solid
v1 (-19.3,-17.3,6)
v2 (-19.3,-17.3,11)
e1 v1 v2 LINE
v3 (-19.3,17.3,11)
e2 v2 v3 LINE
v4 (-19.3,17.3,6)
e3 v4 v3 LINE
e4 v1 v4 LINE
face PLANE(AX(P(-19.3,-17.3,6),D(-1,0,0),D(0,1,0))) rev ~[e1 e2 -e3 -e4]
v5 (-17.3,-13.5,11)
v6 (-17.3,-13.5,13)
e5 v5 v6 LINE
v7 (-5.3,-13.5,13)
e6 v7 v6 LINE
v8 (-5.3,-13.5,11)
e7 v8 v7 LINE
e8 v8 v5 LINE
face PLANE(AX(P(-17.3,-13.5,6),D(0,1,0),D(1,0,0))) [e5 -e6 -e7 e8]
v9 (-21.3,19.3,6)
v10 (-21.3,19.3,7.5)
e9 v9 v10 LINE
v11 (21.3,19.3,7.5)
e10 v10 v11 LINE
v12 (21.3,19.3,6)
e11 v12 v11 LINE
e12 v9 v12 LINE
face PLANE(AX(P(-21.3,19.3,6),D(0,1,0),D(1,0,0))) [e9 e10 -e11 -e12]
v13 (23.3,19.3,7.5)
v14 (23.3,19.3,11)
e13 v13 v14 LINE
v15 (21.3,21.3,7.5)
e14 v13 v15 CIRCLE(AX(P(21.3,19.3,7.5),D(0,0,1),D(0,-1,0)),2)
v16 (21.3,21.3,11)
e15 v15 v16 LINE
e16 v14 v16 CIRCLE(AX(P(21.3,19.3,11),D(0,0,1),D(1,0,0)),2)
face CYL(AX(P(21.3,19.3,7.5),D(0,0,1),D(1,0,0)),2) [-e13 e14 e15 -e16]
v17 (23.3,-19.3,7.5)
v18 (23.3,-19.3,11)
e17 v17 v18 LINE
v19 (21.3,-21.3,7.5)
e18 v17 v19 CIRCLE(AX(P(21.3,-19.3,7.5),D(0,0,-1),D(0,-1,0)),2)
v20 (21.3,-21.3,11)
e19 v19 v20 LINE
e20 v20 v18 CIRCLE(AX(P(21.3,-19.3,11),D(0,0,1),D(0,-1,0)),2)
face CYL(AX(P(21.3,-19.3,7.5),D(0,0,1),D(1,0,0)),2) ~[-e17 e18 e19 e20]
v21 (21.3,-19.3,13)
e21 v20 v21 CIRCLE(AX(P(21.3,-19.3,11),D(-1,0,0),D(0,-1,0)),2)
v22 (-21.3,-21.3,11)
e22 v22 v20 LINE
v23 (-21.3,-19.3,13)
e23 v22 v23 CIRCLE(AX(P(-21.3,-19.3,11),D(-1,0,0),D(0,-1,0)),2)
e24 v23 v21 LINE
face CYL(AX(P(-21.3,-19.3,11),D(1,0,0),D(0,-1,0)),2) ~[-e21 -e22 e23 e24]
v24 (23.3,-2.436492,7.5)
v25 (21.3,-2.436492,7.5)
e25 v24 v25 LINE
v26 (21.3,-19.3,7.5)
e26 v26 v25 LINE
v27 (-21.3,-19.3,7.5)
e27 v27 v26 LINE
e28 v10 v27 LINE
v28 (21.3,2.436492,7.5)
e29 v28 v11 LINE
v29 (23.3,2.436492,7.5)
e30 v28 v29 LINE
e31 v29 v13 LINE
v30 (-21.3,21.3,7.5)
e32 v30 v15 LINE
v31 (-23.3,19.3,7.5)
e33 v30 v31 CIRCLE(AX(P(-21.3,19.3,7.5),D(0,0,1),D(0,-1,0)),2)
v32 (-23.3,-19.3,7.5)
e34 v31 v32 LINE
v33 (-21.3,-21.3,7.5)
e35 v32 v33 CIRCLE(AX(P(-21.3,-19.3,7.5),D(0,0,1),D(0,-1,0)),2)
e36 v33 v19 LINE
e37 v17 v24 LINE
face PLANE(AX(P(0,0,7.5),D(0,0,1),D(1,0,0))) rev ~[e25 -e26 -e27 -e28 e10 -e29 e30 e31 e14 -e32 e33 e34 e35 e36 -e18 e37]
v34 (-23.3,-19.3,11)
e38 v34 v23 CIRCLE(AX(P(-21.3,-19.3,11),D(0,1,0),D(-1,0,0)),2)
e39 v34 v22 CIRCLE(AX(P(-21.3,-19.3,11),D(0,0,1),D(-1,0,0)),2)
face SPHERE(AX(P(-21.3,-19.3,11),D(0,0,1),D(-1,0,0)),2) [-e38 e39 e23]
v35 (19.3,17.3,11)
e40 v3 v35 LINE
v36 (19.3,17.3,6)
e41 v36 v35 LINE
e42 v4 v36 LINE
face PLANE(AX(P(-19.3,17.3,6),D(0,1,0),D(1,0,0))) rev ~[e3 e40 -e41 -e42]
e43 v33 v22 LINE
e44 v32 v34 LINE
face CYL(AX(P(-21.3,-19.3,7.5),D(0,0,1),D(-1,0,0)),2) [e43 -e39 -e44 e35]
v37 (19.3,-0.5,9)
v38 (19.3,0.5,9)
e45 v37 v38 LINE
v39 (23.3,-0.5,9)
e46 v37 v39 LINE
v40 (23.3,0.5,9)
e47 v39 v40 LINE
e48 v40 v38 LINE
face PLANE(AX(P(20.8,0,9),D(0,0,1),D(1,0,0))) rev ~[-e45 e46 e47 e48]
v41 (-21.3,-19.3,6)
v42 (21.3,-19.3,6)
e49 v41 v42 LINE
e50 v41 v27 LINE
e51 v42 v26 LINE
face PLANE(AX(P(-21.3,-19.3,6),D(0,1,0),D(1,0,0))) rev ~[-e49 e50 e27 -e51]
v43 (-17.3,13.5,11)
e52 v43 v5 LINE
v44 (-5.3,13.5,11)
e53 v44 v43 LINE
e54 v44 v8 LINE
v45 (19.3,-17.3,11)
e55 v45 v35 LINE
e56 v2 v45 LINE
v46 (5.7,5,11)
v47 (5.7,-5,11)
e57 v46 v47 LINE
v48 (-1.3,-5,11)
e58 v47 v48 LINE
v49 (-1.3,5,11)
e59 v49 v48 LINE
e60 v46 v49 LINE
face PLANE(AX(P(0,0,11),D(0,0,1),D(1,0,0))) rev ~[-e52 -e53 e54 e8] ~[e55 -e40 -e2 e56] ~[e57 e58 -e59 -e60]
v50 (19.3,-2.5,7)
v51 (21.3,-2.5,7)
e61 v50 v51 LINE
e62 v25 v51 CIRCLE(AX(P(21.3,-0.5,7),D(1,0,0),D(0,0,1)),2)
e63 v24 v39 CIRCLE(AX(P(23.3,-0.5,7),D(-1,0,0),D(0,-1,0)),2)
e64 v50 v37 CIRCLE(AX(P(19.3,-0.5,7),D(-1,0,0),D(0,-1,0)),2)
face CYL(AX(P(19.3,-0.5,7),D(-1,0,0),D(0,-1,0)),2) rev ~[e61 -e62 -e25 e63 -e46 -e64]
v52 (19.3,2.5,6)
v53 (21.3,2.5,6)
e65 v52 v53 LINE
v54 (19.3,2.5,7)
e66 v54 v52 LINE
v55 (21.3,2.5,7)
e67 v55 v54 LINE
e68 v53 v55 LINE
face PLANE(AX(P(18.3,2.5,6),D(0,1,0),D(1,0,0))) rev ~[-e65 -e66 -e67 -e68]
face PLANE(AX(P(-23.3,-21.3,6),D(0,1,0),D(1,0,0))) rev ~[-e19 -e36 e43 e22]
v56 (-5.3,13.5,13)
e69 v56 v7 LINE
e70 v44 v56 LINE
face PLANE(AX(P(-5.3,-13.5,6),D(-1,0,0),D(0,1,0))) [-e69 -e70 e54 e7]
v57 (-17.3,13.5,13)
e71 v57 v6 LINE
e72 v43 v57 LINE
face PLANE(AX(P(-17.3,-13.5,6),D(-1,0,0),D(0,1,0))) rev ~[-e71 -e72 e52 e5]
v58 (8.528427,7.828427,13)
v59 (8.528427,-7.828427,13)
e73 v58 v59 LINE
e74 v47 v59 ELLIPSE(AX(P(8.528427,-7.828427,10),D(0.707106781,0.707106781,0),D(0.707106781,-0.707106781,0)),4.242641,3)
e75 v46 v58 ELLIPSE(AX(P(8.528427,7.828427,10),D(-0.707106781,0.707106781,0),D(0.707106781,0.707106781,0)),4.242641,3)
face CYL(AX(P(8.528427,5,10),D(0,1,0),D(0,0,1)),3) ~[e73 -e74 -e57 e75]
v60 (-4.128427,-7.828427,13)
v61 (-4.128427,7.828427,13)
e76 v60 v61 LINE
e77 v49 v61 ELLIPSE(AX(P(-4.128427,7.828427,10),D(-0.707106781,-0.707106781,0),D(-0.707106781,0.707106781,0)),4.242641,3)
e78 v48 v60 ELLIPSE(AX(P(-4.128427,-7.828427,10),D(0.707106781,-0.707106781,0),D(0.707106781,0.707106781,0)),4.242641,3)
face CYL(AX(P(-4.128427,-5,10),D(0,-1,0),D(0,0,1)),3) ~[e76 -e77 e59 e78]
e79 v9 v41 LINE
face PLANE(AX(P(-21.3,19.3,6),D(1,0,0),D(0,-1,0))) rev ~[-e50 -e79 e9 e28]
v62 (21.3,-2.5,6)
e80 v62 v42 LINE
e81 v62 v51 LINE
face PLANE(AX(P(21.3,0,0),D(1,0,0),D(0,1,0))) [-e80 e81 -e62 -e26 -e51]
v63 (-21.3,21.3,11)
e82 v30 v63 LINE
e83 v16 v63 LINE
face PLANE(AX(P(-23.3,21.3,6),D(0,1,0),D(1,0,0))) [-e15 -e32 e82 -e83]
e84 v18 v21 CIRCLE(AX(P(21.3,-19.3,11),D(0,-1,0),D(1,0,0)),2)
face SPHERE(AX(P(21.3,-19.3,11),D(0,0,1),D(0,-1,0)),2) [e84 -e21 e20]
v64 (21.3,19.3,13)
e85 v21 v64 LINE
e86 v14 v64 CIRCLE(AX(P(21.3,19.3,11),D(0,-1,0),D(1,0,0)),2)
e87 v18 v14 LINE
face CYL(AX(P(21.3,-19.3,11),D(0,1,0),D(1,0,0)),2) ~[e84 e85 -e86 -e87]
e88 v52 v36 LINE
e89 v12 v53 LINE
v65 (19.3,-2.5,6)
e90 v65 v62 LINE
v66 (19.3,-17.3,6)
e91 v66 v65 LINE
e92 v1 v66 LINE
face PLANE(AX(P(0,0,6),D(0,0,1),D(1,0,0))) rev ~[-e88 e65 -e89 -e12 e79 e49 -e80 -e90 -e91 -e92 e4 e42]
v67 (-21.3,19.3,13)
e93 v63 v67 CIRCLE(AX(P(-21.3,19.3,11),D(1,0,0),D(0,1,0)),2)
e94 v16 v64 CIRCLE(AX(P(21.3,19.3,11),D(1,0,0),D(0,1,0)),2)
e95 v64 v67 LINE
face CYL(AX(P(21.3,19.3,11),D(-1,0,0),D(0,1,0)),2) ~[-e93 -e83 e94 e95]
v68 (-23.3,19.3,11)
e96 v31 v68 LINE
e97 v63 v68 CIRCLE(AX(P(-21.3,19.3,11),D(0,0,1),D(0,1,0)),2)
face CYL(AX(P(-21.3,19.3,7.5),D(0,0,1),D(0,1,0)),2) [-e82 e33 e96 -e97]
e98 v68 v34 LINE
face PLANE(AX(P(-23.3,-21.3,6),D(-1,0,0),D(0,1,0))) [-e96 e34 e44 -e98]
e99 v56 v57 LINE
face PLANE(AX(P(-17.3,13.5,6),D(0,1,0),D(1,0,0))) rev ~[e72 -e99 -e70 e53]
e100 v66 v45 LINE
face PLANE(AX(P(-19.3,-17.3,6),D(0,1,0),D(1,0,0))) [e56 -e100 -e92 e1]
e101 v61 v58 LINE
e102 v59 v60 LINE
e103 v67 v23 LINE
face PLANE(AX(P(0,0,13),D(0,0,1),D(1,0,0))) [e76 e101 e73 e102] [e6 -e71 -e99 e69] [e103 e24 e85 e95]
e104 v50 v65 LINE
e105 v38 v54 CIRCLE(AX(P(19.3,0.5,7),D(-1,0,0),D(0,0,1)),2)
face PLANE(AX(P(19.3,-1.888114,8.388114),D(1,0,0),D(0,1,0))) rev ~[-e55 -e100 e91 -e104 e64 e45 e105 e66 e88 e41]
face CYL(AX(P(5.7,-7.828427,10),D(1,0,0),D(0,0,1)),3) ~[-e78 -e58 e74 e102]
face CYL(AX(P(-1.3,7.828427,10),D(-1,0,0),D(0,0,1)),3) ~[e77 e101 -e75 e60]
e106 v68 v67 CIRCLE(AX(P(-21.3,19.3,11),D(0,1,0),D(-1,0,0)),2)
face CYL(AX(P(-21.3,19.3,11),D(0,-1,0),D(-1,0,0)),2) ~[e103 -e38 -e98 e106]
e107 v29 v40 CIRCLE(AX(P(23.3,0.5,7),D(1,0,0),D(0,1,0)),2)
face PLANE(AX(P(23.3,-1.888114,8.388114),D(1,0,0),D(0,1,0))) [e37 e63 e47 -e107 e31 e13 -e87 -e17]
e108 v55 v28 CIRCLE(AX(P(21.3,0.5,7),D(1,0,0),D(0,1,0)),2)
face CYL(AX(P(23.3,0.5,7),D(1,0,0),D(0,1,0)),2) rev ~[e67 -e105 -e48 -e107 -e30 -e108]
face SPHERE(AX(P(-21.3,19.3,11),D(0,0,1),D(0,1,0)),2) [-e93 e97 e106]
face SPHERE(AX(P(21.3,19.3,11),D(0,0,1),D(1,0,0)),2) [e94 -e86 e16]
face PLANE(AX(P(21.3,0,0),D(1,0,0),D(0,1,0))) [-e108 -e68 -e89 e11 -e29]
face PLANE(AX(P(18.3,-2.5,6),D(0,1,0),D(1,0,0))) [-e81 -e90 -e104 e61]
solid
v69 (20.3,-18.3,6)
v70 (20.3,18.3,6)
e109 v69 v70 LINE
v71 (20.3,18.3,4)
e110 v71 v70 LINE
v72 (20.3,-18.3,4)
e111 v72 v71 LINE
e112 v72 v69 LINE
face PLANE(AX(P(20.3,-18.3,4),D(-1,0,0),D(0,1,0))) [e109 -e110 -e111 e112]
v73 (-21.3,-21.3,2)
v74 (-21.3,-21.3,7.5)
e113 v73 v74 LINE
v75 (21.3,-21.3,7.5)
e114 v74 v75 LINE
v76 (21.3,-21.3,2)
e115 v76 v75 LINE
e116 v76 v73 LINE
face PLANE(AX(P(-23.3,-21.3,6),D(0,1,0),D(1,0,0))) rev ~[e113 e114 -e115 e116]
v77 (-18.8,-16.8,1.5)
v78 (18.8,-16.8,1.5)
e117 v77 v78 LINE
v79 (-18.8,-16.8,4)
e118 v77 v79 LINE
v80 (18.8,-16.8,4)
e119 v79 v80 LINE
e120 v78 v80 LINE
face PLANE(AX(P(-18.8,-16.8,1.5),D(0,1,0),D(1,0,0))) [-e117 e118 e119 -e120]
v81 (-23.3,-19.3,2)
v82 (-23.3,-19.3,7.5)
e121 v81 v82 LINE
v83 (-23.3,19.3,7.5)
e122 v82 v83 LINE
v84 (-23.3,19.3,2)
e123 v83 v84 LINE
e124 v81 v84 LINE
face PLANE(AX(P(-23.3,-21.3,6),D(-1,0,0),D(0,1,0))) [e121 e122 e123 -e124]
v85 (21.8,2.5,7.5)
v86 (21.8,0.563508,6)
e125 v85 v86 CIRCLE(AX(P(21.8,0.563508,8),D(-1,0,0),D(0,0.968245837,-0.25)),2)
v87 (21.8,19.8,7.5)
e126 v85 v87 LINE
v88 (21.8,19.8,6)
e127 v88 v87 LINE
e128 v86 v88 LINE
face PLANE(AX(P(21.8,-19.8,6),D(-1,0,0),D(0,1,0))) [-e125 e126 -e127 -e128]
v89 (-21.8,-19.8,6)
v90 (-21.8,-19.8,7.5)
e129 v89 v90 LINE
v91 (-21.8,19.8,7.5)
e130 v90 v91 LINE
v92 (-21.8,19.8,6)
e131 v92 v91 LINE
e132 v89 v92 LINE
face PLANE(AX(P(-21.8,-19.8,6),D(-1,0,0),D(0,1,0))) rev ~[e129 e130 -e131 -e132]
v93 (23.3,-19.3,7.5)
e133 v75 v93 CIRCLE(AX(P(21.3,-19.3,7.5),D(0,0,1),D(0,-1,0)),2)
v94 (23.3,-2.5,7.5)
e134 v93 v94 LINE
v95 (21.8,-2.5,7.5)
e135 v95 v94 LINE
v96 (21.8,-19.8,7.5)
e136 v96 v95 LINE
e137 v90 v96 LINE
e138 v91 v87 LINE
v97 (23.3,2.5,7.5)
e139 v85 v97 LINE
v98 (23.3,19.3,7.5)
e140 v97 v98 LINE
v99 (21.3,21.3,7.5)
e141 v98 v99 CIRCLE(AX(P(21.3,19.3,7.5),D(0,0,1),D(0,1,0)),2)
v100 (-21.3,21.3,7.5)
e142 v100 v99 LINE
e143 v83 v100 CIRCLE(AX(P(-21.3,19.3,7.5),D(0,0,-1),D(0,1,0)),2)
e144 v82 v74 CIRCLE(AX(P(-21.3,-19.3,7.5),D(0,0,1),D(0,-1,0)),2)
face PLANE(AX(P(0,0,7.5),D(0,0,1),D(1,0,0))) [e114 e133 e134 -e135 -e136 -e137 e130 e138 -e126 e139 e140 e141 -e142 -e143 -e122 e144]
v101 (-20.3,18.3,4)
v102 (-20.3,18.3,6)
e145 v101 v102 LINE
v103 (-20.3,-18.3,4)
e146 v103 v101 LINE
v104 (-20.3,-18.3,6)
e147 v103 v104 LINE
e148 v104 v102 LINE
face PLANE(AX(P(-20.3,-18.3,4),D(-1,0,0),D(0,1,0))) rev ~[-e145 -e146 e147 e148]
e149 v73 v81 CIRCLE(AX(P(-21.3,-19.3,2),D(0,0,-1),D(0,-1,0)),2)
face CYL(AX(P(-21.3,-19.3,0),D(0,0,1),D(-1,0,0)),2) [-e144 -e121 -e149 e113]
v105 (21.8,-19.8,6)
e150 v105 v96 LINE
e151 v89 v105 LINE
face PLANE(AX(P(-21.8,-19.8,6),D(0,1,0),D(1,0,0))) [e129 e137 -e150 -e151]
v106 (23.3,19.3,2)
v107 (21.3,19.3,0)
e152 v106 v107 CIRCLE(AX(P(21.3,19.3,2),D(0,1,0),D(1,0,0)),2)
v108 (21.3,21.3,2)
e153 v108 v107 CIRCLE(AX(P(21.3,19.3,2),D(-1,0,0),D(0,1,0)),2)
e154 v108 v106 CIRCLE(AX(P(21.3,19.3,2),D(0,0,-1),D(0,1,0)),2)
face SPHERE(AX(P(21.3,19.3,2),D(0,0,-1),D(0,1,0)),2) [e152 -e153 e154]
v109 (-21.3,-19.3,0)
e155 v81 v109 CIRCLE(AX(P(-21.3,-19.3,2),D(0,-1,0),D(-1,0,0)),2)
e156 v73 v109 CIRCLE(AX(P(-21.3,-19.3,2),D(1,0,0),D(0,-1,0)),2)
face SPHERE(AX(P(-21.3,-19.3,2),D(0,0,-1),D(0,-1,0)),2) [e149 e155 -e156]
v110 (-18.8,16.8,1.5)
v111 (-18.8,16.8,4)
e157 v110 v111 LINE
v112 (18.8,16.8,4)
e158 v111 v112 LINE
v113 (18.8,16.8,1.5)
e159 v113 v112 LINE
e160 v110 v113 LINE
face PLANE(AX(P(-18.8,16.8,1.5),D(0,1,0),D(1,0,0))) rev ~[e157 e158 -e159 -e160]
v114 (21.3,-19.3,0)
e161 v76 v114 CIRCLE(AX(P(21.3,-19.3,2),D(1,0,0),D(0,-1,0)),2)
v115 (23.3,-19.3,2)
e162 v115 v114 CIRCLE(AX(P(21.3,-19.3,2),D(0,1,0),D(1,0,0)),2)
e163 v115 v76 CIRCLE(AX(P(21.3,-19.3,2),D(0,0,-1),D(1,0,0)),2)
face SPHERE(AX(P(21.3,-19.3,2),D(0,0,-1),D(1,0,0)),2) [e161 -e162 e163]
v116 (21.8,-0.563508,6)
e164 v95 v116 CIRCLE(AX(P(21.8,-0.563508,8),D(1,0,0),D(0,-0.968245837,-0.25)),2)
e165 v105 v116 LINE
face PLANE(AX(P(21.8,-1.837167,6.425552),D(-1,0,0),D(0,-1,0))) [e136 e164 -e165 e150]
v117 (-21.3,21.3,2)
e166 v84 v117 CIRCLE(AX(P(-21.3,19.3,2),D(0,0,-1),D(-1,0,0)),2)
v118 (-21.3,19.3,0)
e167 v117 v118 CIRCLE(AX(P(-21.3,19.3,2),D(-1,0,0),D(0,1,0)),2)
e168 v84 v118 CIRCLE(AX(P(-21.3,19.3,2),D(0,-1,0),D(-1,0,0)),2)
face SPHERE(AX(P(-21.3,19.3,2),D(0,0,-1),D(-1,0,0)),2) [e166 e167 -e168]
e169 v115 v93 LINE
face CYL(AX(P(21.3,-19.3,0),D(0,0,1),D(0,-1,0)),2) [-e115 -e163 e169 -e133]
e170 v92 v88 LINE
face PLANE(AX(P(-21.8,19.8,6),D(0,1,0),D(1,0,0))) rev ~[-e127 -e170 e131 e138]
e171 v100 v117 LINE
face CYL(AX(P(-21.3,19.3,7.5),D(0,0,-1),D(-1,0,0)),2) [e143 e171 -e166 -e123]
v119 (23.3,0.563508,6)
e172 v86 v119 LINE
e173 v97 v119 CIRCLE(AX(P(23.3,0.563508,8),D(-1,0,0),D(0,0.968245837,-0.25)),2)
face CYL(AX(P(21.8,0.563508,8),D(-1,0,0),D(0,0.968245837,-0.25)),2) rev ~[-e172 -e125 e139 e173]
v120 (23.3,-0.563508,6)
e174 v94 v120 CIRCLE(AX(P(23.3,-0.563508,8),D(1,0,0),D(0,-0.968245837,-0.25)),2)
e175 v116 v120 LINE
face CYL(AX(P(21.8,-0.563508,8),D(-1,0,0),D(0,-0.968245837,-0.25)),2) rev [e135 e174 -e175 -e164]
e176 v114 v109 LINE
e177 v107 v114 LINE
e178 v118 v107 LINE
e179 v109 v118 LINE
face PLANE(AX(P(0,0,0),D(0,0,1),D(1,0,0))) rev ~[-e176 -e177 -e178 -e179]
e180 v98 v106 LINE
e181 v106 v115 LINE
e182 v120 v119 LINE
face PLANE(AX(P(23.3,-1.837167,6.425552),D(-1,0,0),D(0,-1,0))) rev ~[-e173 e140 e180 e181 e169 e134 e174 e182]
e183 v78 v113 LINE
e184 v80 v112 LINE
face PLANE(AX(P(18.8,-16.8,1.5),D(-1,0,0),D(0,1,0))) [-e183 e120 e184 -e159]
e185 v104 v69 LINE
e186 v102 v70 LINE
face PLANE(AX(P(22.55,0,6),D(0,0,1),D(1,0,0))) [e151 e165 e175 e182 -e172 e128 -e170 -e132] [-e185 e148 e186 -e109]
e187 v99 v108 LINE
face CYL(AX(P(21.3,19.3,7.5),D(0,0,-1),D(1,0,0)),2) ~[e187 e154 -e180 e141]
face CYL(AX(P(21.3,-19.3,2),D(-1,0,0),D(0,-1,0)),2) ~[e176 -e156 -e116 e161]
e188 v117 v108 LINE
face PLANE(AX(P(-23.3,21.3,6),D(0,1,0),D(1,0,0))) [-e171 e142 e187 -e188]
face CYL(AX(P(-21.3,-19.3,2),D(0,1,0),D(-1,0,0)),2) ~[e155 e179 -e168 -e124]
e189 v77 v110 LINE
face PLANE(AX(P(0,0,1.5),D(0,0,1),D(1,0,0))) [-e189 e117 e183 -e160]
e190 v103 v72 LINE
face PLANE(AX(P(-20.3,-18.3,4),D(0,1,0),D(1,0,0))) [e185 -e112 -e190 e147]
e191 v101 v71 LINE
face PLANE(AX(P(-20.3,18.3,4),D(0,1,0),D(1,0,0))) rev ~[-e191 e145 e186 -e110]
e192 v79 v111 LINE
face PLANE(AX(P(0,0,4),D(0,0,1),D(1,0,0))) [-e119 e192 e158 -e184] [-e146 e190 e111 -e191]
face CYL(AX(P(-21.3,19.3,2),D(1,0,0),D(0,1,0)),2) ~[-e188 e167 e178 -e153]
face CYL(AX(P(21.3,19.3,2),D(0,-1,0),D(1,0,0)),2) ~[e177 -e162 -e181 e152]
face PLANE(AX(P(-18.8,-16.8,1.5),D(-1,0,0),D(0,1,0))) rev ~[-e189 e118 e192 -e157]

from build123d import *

# Parameters (mm, degrees)
F2_W          = 46.6
F2_H          = 42.6
F3_DEPTH      = 6
F5_W          = 37.6
F5_H          = 33.6
F6_DEPTH      = 4.5
F8_W          = 40.6
F8_H          = 36.6
F8_W_2        = 37.6
F8_H_2        = 33.6
F9_DEPTH      = 2
F10_W         = 46.6
F10_H         = 42.6
F10_W_2       = 43.6
F10_H_2       = 39.6
F11_DEPTH     = 1.5
F12_R         = 2
F13_W         = 1.5
F13_H         = 5
F14_DEPTH     = 1.5
F15_T1_DEPTH  = 1.5
F16_R         = 2
F18_W         = 46.6
F18_H         = 42.6
F19_DEPTH     = 7
F20_W         = 38.6
F20_H         = 34.6
F21_DEPTH     = 5
F22_W         = 46.6
F22_H         = 42.6
F22_W_2       = 42.6
F22_H_2       = 38.6
F23_DEPTH     = 1.5
F24_W         = 5
F24_H         = 5
F25_DEPTH     = 3
F26_T4_DEPTH  = 4
F26_T10_DEPTH = 4
F26_T16_DEPTH = 4
F26_T22_DEPTH = 4
F26_T28_DEPTH = 4
F26_T34_DEPTH = 4
F27_W         = 7
F27_H         = 10
F27_W_2       = 12
F27_H_2       = 27
F28_DEPTH     = 9.4
F29_R         = 2
F30_R         = 2
F31_T1_DEPTH  = 7
F31_T3_DEPTH  = 10
F31_T9_DEPTH  = 14.0710678119
F31_T14_DEPTH = 17.0710678119
F31_T21_DEPTH = 17.0710678119
F31_T25_DEPTH = 14.0710678119
F31_T32_DEPTH = 14.0710678119
F31_T36_DEPTH = 17.0710678119
F31_T43_DEPTH = 14.0710678119
F31_T48_DEPTH = 17.0710678119


# Not quite as in the source:
# - a fillet or chamfer that OpenCascade refuses, or shapes differently, is made with other operations: its cross-section is extruded or revolved along the edge and cut away or added


with BuildPart() as f3:
    # F2 (on Top) → F3 (new body)
    with BuildSketch(Plane.XY):
        Rectangle(F2_W, F2_H)
    extrude(amount=F3_DEPTH)

    # F5 (on offset) → F6 (cut)
    with BuildSketch(Plane.XY.offset(1.5)):
        Rectangle(F5_W, F5_H)
    extrude(amount=F6_DEPTH, mode=Mode.SUBTRACT)

    # F8 (on offset) → F9 (cut)
    with BuildSketch(Plane.XY.offset(4)):
        Rectangle(F8_W, F8_H)
        Rectangle(F8_W_2, F8_H_2, mode=Mode.SUBTRACT)
    extrude(amount=F9_DEPTH, mode=Mode.SUBTRACT)

    # F10 (on face) → F11 (join)
    with BuildSketch(Plane.XY.offset(6)):
        Rectangle(F10_W, F10_H)
        Rectangle(F10_W_2, F10_H_2, mode=Mode.SUBTRACT)
    extrude(amount=F11_DEPTH)

    # F12
    f12_edges = [f3.edges().sort_by_distance(p)[0] for p in [
        (-23.3, 21.3, 3.75),
        (-23.3, -21.3, 3.75),
        (23.3, 21.3, 3.75),
        (23.3, -21.3, 3.75),
    ]]
    fillet(f12_edges, radius=F12_R)

    # F13 (on face) → F14 (cut)
    with BuildSketch(Plane.XY.offset(7.5)):
        with Locations((22.55, 0)):
            Rectangle(F13_W, F13_H)
    extrude(amount=-F14_DEPTH, mode=Mode.SUBTRACT)

    # F15: fillet of radius 2 on 2 edges, made by hand

    # F15_s2 → F15_t1 (join)
    with BuildSketch(Plane.YZ.offset(21.8)):
        with BuildLine():
            ThreePointArc((-2.5, 7.5), (-1.7882531983, 6.4188611699), (-0.5635083269, 6))
            Line((-0.5635083269, 6), (-2.5, 6))
            Line((-2.5, 6), (-2.5, 7.5))
        make_face()
        with BuildLine():
            ThreePointArc((2.5, 7.5), (1.7882531983, 6.4188611699), (0.5635083269, 6))
            Line((0.5635083269, 6), (2.5, 6))
            Line((2.5, 6), (2.5, 7.5))
        make_face()
    extrude(amount=F15_T1_DEPTH)

    # F16
    f16_edges = [f3.edges().sort_by_distance(p)[0] for p in [
        (-23.3, 0, 0),
    ]]
    fillet(f16_edges, radius=F16_R)


with BuildPart() as f19:
    # F18 (on offset) → F19 (new body)
    with BuildSketch(Plane.XY.offset(6)):
        Rectangle(F18_W, F18_H)
    extrude(amount=F19_DEPTH)

    # F20 (on offset) → F21 (cut)
    with BuildSketch(Plane.XY.offset(6)):
        Rectangle(F20_W, F20_H)
    extrude(amount=F21_DEPTH, mode=Mode.SUBTRACT)

    # F22 (on face) → F23 (cut)
    with BuildSketch(Plane(origin=(0, 0, 6), x_dir=(1, 0, 0), z_dir=(0, 0, -1))):
        Rectangle(F22_W, F22_H)
        Rectangle(F22_W_2, F22_H_2, mode=Mode.SUBTRACT)
    extrude(amount=-F23_DEPTH, mode=Mode.SUBTRACT)

    # F24 (on offset) → F25 (cut)
    with BuildSketch(Plane.XY.offset(6)):
        with Locations((20.8, 0)):
            Rectangle(F24_W, F24_H)
    extrude(amount=F25_DEPTH, mode=Mode.SUBTRACT)

    # F26: fillet of radius 2 on 2 edges, made by hand


with BuildPart() as f26_tool2:
    # F26_s3 → F26_t4 (new body)
    with BuildSketch(Plane.YZ.offset(23.3)):
        with BuildLine():
            ThreePointArc((2.5, 7), (1.9142135624, 8.4142135624), (0.5, 9))
            Line((0.5, 9), (2.5, 9))
            Line((2.5, 9), (2.5, 7))
        make_face()
    extrude(amount=-F26_T4_DEPTH)

    split(bisect_by=Plane.XY.offset(7.5), keep=Keep.TOP)

    split(bisect_by=Plane.YZ.offset(21.3), keep=Keep.TOP)


with BuildPart() as f19_1:
    add(f19.part)

    # F26_t1: union F26_tool2
    add(f26_tool2.part)


with BuildPart() as f26_tool8:
    # F26_s9 → F26_t10 (new body)
    with BuildSketch(Plane.YZ.offset(23.3)):
        with BuildLine():
            ThreePointArc((2.5, 7), (1.9142135624, 8.4142135624), (0.5, 9))
            Line((0.5, 9), (2.5, 9))
            Line((2.5, 9), (2.5, 7))
        make_face()
    extrude(amount=-F26_T10_DEPTH)

    split(bisect_by=Plane.XY.offset(7.5), keep=Keep.BOTTOM)

    split(bisect_by=Plane.YZ.offset(21.3), keep=Keep.BOTTOM)


with BuildPart() as f19_2:
    add(f19_1.part)

    # F26_t7: union F26_tool8
    add(f26_tool8.part)


with BuildPart() as f26_tool14:
    # F26_s15 → F26_t16 (new body)
    with BuildSketch(Plane.YZ.offset(23.3)):
        with BuildLine():
            ThreePointArc((2.5, 7), (1.9142135624, 8.4142135624), (0.5, 9))
            Line((0.5, 9), (2.5, 9))
            Line((2.5, 9), (2.5, 7))
        make_face()
    extrude(amount=-F26_T16_DEPTH)

    split(bisect_by=Plane.XY.offset(7.5), keep=Keep.TOP)

    split(bisect_by=Plane.YZ.offset(21.3), keep=Keep.BOTTOM)


with BuildPart() as f19_3:
    add(f19_2.part)

    # F26_t13: union F26_tool14
    add(f26_tool14.part)


with BuildPart() as f26_tool20:
    # F26_s21 → F26_t22 (new body)
    with BuildSketch(Plane.YZ.offset(19.3)):
        with BuildLine():
            ThreePointArc((-2.5, 7), (-1.9142135624, 8.4142135624), (-0.5, 9))
            Line((-0.5, 9), (-2.5, 9))
            Line((-2.5, 9), (-2.5, 7))
        make_face()
    extrude(amount=F26_T22_DEPTH)

    split(bisect_by=Plane.XY.offset(7.5), keep=Keep.BOTTOM)

    split(bisect_by=Plane.YZ.offset(21.3), keep=Keep.BOTTOM)


with BuildPart() as f19_4:
    add(f19_3.part)

    # F26_t19: union F26_tool20
    add(f26_tool20.part)


with BuildPart() as f26_tool26:
    # F26_s27 → F26_t28 (new body)
    with BuildSketch(Plane.YZ.offset(19.3)):
        with BuildLine():
            ThreePointArc((-2.5, 7), (-1.9142135624, 8.4142135624), (-0.5, 9))
            Line((-0.5, 9), (-2.5, 9))
            Line((-2.5, 9), (-2.5, 7))
        make_face()
    extrude(amount=F26_T28_DEPTH)

    split(bisect_by=Plane.XY.offset(7.5), keep=Keep.TOP)

    split(bisect_by=Plane.YZ.offset(21.3), keep=Keep.BOTTOM)


with BuildPart() as f19_5:
    add(f19_4.part)

    # F26_t25: union F26_tool26
    add(f26_tool26.part)


with BuildPart() as f26_tool32:
    # F26_s33 → F26_t34 (new body)
    with BuildSketch(Plane.YZ.offset(19.3)):
        with BuildLine():
            ThreePointArc((-2.5, 7), (-1.9142135624, 8.4142135624), (-0.5, 9))
            Line((-0.5, 9), (-2.5, 9))
            Line((-2.5, 9), (-2.5, 7))
        make_face()
    extrude(amount=F26_T34_DEPTH)

    split(bisect_by=Plane.XY.offset(7.5), keep=Keep.TOP)

    split(bisect_by=Plane.YZ.offset(21.3), keep=Keep.TOP)


with BuildPart() as f19_6:
    add(f19_5.part)

    # F26_t31: union F26_tool32
    add(f26_tool32.part)

    # F27 (on offset) → F28 (cut)
    with BuildSketch(Plane.XY.offset(6)):
        with Locations((2.2, 0)):
            Rectangle(F27_W, F27_H)
        with Locations((-11.3, 0)):
            Rectangle(F27_W_2, F27_H_2)
    extrude(amount=F28_DEPTH, mode=Mode.SUBTRACT)

    # F29
    f29_edges = [f19_6.edges().sort_by_distance(p)[0] for p in [
        (-23.3, -21.3, 10.25),
        (23.3, -21.3, 10.25),
        (23.3, 21.3, 10.25),
        (-23.3, 21.3, 10.25),
    ]]
    fillet(f29_edges, radius=F29_R)

    # F30
    f30_edges = [f19_6.edges().sort_by_distance(p)[0] for p in [
        (23.3, 0, 13),
        (0, 21.3, 13),
        (-22.714214, 20.714214, 13),
        (22.714214, 20.714214, 13),
        (-23.3, 0, 13),
        (22.714214, -20.714214, 13),
        (-22.714214, -20.714214, 13),
        (0, -21.3, 13),
    ]]
    fillet(f30_edges, radius=F30_R)

    # F31: fillet of radius 3 on 4 edges, made by hand

    # F31_s2 → F31_t1 (cut)
    with BuildSketch(Plane.YZ.offset(-1.3)):
        with BuildLine():
            ThreePointArc((7.8284271247, 13), (6.0963763172, 12.4494897428), (5, 11))
            Line((5, 11), (5, 13))
            Line((5, 13), (7.8284271247, 13))
        make_face()
        with BuildLine():
            ThreePointArc((-7.8284271247, 13), (-6.0963763172, 12.4494897428), (-5, 11))
            Line((-5, 11), (-5, 13))
            Line((-5, 13), (-7.8284271247, 13))
        make_face()
    extrude(amount=F31_T1_DEPTH, mode=Mode.SUBTRACT)

    # F31_s4 → F31_t3 (cut)
    with BuildSketch(Plane.XZ.offset(-5)):
        with BuildLine():
            ThreePointArc((8.5284271247, 13), (6.7963763172, 12.4494897428), (5.7, 11))
            Line((5.7, 11), (5.7, 13))
            Line((5.7, 13), (8.5284271247, 13))
        make_face()
        with BuildLine():
            ThreePointArc((-4.1284271247, 13), (-2.3963763172, 12.4494897428), (-1.3, 11))
            Line((-1.3, 11), (-1.3, 13))
            Line((-1.3, 13), (-4.1284271247, 13))
        make_face()
    extrude(amount=F31_T3_DEPTH, mode=Mode.SUBTRACT)


with BuildPart() as f31_tool7:
    # F31_s8 → F31_t9 (new body)
    with BuildSketch(Plane.YZ.offset(-8.3710678119)):
        with BuildLine():
            ThreePointArc((7.8284271247, 13), (6.0963763172, 12.4494897428), (5, 11))
            Line((5, 11), (5, 13))
            Line((5, 13), (7.8284271247, 13))
        make_face()
    extrude(amount=F31_T9_DEPTH)

    split(bisect_by=Plane.YZ.offset(-5.3), keep=Keep.TOP)

    split(bisect_by=Plane.YZ.offset(-1.3), keep=Keep.BOTTOM)


with BuildPart() as f31_tool12:
    # F31_s13 → F31_t14 (new body)
    with BuildSketch(Plane.XZ.offset(5)):
        with BuildLine():
            ThreePointArc((-4.1284271247, 13), (-2.3963763172, 12.4494897428), (-1.3, 11))
            Line((-1.3, 11), (-1.3, 13))
            Line((-1.3, 13), (-4.1284271247, 13))
        make_face()
    extrude(amount=-F31_T14_DEPTH)

    split(bisect_by=Plane.XZ.offset(-5), keep=Keep.BOTTOM)


with BuildPart() as f31_tool7_1:
    add(f31_tool7.part)

    # F31_t16: intersect F31_tool12
    add(f31_tool12.part, mode=Mode.INTERSECT)


with BuildPart() as f19_7:
    add(f19_6.part)

    # F31_t5: cut F31_tool7
    add(f31_tool7_1.part, mode=Mode.SUBTRACT)


with BuildPart() as f31_tool19:
    # F31_s20 → F31_t21 (new body)
    with BuildSketch(Plane.XZ.offset(-12.0710678119)):
        with BuildLine():
            ThreePointArc((8.5284271247, 13), (6.7963763172, 12.4494897428), (5.7, 11))
            Line((5.7, 11), (5.7, 13))
            Line((5.7, 13), (8.5284271247, 13))
        make_face()
    extrude(amount=F31_T21_DEPTH)

    split(bisect_by=Plane.XZ.offset(-5), keep=Keep.BOTTOM)


with BuildPart() as f31_tool23:
    # F31_s24 → F31_t25 (new body)
    with BuildSketch(Plane.YZ.offset(-1.3)):
        with BuildLine():
            ThreePointArc((7.8284271247, 13), (6.0963763172, 12.4494897428), (5, 11))
            Line((5, 11), (5, 13))
            Line((5, 13), (7.8284271247, 13))
        make_face()
    extrude(amount=F31_T25_DEPTH)

    split(bisect_by=Plane.YZ.offset(5.7), keep=Keep.TOP)


with BuildPart() as f31_tool19_1:
    add(f31_tool19.part)

    # F31_t27: intersect F31_tool23
    add(f31_tool23.part, mode=Mode.INTERSECT)


with BuildPart() as f19_8:
    add(f19_7.part)

    # F31_t17: cut F31_tool19
    add(f31_tool19_1.part, mode=Mode.SUBTRACT)


with BuildPart() as f31_tool30:
    # F31_s31 → F31_t32 (new body)
    with BuildSketch(Plane.YZ.offset(12.7710678119)):
        with BuildLine():
            ThreePointArc((-7.8284271247, 13), (-6.0963763172, 12.4494897428), (-5, 11))
            Line((-5, 11), (-5, 13))
            Line((-5, 13), (-7.8284271247, 13))
        make_face()
    extrude(amount=-F31_T32_DEPTH)

    split(bisect_by=Plane.YZ.offset(5.7), keep=Keep.TOP)


with BuildPart() as f31_tool34:
    # F31_s35 → F31_t36 (new body)
    with BuildSketch(Plane.XZ.offset(-5)):
        with BuildLine():
            ThreePointArc((8.5284271247, 13), (6.7963763172, 12.4494897428), (5.7, 11))
            Line((5.7, 11), (5.7, 13))
            Line((5.7, 13), (8.5284271247, 13))
        make_face()
    extrude(amount=F31_T36_DEPTH)

    split(bisect_by=Plane.XZ.offset(5), keep=Keep.TOP)


with BuildPart() as f31_tool30_1:
    add(f31_tool30.part)

    # F31_t38: intersect F31_tool34
    add(f31_tool34.part, mode=Mode.INTERSECT)


with BuildPart() as f19_9:
    add(f19_8.part)

    # F31_t28: cut F31_tool30
    add(f31_tool30_1.part, mode=Mode.SUBTRACT)


with BuildPart() as f31_tool41:
    # F31_s42 → F31_t43 (new body)
    with BuildSketch(Plane.YZ.offset(5.7)):
        with BuildLine():
            ThreePointArc((-7.8284271247, 13), (-6.0963763172, 12.4494897428), (-5, 11))
            Line((-5, 11), (-5, 13))
            Line((-5, 13), (-7.8284271247, 13))
        make_face()
    extrude(amount=-F31_T43_DEPTH)

    split(bisect_by=Plane.YZ.offset(-5.3), keep=Keep.TOP)

    split(bisect_by=Plane.YZ.offset(-1.3), keep=Keep.BOTTOM)


with BuildPart() as f31_tool46:
    # F31_s47 → F31_t48 (new body)
    with BuildSketch(Plane.XZ.offset(12.0710678119)):
        with BuildLine():
            ThreePointArc((-4.1284271247, 13), (-2.3963763172, 12.4494897428), (-1.3, 11))
            Line((-1.3, 11), (-1.3, 13))
            Line((-1.3, 13), (-4.1284271247, 13))
        make_face()
    extrude(amount=-F31_T48_DEPTH)

    split(bisect_by=Plane.XZ.offset(5), keep=Keep.TOP)


with BuildPart() as f31_tool41_1:
    add(f31_tool41.part)

    # F31_t50: intersect F31_tool46
    add(f31_tool46.part, mode=Mode.INTERSECT)


with BuildPart() as f19_10:
    add(f19_9.part)

    # F31_t39: cut F31_tool41
    add(f31_tool41_1.part, mode=Mode.SUBTRACT)


solid = Compound([f3.part, f19_10.part])
